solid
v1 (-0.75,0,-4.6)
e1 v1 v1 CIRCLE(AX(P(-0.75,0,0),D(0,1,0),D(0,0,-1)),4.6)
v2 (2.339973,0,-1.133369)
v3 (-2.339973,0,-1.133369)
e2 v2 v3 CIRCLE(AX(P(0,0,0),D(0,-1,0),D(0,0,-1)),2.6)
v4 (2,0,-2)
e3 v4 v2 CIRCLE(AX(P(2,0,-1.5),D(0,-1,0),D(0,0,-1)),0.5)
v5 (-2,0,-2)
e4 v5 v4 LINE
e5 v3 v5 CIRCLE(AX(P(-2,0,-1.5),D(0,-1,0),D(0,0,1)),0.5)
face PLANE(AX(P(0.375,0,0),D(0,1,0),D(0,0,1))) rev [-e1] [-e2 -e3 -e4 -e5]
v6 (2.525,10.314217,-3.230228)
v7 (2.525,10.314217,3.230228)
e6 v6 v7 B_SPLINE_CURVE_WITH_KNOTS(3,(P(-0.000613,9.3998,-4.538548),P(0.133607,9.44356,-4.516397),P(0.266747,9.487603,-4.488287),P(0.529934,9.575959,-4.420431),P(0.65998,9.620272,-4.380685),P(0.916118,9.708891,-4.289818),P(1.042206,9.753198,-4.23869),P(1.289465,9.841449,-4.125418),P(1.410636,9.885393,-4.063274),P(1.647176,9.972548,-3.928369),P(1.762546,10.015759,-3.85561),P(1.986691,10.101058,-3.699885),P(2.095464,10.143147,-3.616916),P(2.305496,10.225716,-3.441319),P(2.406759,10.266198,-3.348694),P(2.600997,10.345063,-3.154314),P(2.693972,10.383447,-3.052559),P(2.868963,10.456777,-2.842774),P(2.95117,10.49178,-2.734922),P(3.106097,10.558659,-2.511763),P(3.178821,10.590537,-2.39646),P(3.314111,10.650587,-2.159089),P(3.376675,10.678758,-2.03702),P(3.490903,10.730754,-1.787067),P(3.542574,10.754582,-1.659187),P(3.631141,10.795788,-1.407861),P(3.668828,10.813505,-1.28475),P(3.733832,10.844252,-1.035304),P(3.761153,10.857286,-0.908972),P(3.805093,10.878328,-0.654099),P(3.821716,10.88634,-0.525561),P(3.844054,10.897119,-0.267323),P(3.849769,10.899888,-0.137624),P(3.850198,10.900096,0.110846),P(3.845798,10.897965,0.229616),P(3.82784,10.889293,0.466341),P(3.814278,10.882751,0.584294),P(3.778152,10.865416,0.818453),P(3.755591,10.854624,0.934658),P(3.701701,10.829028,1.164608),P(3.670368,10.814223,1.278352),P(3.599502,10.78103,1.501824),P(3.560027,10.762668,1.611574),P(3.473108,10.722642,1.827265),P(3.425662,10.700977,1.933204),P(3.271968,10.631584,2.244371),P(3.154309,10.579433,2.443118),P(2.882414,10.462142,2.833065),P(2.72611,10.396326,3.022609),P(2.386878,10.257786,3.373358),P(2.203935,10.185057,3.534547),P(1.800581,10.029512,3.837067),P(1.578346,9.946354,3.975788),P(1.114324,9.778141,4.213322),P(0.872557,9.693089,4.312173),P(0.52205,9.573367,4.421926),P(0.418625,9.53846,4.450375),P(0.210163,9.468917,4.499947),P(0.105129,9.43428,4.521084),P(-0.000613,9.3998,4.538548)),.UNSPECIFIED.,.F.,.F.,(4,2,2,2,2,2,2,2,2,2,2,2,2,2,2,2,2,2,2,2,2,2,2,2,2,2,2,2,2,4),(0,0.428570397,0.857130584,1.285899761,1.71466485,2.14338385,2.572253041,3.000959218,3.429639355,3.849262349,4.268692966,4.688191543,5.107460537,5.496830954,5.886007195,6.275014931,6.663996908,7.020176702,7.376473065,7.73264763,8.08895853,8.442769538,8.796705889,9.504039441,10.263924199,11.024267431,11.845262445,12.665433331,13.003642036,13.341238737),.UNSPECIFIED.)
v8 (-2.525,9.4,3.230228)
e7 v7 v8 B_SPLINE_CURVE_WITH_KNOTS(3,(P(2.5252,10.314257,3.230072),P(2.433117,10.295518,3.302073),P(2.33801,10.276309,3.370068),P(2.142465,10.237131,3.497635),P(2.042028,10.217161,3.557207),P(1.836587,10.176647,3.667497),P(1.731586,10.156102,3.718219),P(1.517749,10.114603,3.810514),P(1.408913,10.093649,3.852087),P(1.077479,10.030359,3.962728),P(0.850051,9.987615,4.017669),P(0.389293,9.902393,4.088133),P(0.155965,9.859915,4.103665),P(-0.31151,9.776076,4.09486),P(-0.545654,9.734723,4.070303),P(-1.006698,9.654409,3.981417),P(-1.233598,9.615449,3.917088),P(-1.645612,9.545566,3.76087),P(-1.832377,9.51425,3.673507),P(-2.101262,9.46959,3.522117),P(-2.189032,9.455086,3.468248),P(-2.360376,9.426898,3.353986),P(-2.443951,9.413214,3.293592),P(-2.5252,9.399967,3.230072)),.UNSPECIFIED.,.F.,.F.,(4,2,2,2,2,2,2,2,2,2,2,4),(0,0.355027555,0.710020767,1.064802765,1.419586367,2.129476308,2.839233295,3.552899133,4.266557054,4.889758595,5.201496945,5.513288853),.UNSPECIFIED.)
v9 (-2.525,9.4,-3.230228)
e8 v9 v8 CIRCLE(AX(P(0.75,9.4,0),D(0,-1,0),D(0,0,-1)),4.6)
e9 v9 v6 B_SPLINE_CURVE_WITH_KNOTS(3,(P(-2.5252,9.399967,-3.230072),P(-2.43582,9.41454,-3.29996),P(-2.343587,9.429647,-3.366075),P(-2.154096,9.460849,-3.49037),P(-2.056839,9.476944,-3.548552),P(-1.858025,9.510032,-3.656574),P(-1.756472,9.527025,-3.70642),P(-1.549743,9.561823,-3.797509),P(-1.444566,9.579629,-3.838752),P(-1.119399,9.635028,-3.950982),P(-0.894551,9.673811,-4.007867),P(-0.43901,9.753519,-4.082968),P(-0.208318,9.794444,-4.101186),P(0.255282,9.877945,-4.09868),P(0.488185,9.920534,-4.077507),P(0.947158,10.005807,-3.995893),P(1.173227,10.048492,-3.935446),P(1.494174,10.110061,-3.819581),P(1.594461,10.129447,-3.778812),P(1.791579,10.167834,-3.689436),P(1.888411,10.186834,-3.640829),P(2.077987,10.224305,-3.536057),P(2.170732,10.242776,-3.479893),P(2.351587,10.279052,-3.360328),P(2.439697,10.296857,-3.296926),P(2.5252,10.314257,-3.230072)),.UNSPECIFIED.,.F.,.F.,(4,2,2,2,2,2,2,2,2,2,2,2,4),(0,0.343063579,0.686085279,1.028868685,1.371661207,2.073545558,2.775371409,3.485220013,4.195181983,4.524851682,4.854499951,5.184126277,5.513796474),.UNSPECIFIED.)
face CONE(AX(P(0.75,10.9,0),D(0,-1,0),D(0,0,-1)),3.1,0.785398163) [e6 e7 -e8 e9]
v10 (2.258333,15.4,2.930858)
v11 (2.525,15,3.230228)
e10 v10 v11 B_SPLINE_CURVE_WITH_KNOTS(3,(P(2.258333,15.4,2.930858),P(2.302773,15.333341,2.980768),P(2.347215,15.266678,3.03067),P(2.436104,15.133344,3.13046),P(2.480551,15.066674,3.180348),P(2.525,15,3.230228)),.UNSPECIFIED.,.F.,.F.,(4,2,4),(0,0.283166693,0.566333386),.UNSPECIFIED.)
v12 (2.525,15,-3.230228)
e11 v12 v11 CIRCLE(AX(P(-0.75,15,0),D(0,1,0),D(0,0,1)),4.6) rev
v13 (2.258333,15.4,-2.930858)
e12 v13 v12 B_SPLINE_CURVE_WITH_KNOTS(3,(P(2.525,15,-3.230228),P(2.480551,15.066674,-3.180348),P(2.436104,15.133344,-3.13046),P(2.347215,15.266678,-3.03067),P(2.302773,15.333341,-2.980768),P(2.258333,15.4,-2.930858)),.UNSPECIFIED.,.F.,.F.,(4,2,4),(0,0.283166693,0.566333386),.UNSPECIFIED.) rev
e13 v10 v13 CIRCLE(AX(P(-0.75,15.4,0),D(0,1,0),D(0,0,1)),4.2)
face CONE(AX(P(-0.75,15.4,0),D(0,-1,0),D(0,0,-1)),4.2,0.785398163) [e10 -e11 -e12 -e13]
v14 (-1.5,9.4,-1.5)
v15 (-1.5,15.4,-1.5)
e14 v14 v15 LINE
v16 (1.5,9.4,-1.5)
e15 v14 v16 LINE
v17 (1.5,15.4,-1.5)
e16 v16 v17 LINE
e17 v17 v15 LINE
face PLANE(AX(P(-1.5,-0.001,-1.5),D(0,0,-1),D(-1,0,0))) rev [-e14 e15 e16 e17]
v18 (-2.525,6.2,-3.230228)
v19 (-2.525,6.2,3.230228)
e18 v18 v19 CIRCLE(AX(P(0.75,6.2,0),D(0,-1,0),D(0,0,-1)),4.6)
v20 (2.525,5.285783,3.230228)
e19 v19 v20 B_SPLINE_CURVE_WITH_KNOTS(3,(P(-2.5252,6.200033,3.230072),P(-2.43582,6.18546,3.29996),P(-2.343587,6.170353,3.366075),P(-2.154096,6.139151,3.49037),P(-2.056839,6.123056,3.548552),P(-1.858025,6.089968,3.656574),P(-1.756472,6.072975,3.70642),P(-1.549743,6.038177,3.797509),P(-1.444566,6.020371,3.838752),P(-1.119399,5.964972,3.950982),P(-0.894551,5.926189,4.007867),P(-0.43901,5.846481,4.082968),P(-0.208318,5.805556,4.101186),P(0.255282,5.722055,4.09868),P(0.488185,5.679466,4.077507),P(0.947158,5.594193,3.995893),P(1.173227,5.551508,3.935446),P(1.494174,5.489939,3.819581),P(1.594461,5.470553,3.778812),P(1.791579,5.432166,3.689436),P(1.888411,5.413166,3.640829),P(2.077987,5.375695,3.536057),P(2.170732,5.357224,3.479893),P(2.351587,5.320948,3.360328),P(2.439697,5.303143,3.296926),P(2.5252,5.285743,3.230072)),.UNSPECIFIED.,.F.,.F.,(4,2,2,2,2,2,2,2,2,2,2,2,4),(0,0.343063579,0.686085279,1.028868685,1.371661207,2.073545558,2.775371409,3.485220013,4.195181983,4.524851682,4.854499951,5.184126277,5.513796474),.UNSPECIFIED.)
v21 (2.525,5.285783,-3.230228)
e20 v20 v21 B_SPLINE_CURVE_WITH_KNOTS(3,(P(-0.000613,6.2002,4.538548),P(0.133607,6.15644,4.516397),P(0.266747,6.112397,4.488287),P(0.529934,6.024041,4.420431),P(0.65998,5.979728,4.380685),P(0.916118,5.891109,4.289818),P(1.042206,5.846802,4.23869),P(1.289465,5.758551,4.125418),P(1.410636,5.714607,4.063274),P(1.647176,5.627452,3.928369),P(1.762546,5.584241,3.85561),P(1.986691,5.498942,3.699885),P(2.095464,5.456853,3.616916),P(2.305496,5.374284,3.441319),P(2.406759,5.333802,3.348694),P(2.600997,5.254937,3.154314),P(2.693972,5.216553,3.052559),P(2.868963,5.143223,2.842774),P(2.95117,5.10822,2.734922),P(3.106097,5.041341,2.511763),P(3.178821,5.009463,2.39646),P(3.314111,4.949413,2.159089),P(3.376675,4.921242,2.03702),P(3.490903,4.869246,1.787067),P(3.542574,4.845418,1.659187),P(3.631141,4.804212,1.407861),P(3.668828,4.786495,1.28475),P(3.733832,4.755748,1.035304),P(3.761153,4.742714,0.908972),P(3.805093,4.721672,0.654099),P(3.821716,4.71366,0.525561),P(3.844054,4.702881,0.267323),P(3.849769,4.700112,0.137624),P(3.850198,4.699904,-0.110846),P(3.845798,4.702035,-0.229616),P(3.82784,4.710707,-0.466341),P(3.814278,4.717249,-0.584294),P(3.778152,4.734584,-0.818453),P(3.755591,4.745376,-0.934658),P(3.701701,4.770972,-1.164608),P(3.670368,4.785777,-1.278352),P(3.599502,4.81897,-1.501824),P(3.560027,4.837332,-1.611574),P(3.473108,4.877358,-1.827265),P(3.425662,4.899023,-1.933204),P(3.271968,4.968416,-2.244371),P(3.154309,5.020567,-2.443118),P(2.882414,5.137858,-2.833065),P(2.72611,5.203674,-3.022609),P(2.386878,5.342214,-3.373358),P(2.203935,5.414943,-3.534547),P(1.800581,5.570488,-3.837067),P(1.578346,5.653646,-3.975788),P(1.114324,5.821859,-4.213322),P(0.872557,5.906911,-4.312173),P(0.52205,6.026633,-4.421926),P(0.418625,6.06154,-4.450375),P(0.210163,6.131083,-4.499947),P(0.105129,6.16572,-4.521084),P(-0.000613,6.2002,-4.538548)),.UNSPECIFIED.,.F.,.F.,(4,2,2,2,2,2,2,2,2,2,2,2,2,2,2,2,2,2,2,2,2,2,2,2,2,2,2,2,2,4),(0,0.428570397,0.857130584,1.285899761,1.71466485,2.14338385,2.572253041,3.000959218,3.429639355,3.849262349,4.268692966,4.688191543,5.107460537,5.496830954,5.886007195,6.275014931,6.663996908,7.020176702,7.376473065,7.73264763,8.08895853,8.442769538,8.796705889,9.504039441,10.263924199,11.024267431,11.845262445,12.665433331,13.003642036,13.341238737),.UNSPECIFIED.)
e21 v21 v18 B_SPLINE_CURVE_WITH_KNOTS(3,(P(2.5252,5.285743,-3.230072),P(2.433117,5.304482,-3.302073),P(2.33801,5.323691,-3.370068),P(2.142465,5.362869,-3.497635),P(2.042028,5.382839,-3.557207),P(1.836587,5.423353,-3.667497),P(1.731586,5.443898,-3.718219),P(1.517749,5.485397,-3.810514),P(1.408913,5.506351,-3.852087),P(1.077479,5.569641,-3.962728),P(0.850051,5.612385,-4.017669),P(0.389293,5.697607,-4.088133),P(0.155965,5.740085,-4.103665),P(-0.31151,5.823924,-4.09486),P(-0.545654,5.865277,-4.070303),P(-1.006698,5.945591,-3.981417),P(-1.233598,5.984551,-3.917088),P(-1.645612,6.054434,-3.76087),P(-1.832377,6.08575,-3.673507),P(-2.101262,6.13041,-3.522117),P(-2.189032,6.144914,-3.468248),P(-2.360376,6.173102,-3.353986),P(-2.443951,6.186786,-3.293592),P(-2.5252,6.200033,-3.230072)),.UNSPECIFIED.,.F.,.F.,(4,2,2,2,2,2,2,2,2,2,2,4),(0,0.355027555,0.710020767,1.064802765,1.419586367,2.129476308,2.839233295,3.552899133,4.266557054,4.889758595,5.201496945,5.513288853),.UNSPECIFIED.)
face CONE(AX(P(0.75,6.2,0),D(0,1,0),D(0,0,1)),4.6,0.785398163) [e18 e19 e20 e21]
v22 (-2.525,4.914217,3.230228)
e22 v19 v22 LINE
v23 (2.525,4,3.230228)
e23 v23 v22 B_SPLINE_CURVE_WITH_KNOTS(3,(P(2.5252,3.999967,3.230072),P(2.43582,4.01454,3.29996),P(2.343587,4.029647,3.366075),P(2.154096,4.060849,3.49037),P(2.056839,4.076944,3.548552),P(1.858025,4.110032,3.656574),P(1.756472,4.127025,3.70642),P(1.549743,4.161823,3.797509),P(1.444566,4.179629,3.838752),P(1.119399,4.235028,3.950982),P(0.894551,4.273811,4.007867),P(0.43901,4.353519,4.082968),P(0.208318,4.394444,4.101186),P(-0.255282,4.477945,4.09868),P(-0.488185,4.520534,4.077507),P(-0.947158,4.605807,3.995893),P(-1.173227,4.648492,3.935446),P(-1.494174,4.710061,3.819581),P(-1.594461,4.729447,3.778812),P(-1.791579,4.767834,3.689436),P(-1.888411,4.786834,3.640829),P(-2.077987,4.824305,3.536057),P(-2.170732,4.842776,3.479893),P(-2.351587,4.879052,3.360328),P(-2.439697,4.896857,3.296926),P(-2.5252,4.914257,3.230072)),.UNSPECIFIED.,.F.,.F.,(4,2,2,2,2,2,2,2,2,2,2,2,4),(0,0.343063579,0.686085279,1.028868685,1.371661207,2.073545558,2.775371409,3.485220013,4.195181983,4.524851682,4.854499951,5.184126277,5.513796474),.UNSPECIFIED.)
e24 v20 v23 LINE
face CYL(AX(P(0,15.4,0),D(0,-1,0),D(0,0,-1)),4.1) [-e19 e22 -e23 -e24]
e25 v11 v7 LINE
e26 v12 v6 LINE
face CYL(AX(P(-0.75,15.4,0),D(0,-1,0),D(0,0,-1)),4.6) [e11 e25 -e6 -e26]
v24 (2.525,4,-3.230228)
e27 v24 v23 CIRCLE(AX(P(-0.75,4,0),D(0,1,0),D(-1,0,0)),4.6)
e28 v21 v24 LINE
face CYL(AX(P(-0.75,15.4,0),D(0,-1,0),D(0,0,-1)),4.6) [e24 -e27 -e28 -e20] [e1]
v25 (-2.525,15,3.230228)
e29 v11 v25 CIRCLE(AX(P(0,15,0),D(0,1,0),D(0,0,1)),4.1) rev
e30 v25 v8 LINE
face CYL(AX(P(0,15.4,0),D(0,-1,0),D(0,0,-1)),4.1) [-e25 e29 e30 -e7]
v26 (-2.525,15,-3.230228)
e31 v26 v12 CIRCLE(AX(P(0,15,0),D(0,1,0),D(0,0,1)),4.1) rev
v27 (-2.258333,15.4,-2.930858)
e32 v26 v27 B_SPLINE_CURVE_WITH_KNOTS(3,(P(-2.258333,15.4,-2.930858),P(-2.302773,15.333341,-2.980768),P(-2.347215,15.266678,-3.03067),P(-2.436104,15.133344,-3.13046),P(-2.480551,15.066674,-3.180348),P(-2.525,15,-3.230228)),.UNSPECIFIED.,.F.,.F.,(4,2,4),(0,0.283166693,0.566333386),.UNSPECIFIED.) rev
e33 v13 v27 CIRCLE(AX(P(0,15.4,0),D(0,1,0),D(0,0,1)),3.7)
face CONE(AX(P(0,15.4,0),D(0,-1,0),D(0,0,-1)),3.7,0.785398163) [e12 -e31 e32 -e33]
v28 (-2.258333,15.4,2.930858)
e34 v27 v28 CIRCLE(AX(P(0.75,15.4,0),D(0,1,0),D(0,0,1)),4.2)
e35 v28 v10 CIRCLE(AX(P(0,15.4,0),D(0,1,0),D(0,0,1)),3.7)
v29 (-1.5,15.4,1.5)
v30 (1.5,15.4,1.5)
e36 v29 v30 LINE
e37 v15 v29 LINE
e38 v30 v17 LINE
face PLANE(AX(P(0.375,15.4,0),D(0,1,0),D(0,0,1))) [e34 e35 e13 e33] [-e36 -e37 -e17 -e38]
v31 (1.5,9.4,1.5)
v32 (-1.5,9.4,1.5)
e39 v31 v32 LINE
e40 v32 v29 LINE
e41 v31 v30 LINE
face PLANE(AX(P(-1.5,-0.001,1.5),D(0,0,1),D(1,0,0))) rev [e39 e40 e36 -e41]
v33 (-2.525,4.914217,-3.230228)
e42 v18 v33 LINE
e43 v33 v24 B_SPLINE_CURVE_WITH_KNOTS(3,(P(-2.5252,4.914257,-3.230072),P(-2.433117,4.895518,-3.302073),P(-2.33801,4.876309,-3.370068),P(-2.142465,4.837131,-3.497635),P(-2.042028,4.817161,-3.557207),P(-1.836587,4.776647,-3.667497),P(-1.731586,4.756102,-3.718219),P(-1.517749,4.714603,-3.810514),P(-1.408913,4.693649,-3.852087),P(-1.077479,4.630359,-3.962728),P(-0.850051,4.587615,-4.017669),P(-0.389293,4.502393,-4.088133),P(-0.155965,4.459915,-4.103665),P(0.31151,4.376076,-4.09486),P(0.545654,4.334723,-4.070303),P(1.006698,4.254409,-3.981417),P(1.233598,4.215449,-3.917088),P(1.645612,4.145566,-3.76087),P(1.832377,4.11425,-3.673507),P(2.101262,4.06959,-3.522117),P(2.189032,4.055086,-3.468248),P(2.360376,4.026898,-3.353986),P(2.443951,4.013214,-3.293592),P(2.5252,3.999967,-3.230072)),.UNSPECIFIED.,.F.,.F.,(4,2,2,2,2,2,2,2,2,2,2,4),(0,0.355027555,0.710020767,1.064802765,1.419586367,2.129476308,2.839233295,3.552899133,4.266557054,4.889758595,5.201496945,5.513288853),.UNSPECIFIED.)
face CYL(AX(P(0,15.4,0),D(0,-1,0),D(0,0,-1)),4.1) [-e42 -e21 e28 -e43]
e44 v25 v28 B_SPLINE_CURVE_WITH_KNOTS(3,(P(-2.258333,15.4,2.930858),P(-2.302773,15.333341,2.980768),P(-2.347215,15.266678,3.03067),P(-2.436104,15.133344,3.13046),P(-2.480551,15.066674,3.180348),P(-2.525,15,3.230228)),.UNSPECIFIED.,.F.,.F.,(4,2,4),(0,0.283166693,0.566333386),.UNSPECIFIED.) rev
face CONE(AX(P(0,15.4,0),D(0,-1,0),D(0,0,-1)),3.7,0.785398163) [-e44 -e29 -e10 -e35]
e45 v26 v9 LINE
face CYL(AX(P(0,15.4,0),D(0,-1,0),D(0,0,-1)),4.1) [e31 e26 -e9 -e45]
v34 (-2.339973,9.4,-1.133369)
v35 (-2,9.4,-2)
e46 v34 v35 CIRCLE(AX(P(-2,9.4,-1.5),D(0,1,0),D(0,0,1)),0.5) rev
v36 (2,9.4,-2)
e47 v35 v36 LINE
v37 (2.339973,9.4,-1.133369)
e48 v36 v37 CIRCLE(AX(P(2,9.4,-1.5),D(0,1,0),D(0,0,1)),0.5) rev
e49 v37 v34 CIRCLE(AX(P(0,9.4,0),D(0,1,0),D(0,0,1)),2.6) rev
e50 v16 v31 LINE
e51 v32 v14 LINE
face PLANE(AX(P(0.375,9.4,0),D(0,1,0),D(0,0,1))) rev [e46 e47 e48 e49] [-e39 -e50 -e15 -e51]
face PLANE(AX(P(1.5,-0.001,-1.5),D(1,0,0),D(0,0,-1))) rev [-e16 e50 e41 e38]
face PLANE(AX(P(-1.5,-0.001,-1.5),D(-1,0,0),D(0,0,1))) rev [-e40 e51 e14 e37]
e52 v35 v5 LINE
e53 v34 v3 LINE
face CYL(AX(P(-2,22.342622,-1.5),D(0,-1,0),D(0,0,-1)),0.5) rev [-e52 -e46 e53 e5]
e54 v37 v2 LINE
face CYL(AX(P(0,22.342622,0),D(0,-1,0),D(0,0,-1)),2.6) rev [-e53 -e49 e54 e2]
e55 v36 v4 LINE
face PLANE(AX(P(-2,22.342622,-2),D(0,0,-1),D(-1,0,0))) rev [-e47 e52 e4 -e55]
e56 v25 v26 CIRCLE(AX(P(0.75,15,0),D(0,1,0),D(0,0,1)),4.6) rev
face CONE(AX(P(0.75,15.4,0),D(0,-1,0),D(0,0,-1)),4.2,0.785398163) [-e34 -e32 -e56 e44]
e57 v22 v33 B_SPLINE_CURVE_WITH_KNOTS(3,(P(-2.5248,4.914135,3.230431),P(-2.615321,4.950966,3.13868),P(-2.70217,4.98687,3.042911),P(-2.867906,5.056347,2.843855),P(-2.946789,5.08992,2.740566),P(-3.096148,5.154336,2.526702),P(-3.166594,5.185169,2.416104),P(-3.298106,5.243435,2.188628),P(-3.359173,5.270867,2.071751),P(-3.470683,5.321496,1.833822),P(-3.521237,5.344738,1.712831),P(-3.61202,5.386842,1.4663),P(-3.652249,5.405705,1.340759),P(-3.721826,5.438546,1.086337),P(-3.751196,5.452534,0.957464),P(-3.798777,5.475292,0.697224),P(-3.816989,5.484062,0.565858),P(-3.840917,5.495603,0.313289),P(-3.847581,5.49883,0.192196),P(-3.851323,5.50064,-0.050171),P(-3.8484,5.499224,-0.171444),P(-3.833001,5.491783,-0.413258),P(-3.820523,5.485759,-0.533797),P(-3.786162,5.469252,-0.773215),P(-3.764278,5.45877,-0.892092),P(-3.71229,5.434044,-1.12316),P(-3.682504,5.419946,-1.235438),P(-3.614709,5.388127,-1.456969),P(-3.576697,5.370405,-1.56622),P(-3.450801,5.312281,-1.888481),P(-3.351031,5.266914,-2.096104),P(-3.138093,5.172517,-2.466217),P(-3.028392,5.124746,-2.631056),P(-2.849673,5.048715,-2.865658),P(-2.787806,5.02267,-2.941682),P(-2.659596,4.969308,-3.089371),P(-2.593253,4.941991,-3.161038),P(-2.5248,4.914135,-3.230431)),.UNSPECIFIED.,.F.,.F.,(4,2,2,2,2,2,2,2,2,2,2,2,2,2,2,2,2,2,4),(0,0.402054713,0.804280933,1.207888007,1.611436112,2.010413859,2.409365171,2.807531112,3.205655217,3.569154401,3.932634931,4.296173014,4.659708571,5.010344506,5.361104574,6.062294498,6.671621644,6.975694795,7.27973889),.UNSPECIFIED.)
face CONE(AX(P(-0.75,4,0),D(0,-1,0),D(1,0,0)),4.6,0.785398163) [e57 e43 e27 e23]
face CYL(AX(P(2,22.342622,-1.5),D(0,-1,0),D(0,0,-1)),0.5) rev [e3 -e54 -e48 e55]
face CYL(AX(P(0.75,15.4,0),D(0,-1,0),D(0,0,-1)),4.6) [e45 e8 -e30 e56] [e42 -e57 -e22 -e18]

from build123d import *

# Parameters (mm, degrees)
BOSS_EXTRUDE1_DEPTH = 15.4
CUT_EXTRUDE1_DEPTH  = 9.4
CUT_EXTRUDE2_REACH  = 18.939
SKETCH5_W           = 3
SKETCH5_H           = 3
CHAMFER1_SIZE       = 0.4


with BuildPart() as part:
    # Sketch1 → Boss-Extrude1 (new body)
    with BuildSketch(Plane(origin=(0, 0, 0), x_dir=(1, 0, 0), z_dir=(0, 1, 0))):
        with BuildLine():
            ThreePointArc((-2.525, -3.23022832), (0, -4.1), (2.525, -3.23022832))
            ThreePointArc((2.525, -3.23022832), (3.85, 0), (2.525, 3.23022832))
            ThreePointArc((2.525, 3.23022832), (0, 4.1), (-2.525, 3.23022832))
            ThreePointArc((-2.525, 3.23022832), (-3.85, 0), (-2.525, -3.23022832))
        make_face()
    extrude(amount=BOSS_EXTRUDE1_DEPTH)

    # Sketch2 → Revolve1 (revolve)
    with BuildSketch(Plane.XY, mode=Mode.PRIVATE) as revolve1_sk:
        Polygon((3.85, 0), (3.85, 4), (2.35, 5.5), (-0.75, 5.5), (-0.75, 0), align=None)
    revolve(revolve1_sk.sketch.rotate(Axis((-0.75, 5.5, 0), (0, -1, 0)), 270), axis=Axis((-0.75, 5.5, 0), (0, -1, 0)))

    # Sketch3 → Revolve2 (revolve)
    with BuildSketch(Plane.XY, mode=Mode.PRIVATE) as revolve2_sk:
        Polygon((0.75, 4.7), (-2.35, 4.7), (-3.85, 6.2), (-3.85, 9.4), (-2.35, 10.9), (0.75, 10.9), align=None)
    revolve(revolve2_sk.sketch.rotate(Axis((0.75, 4.7, 0), (0, 1, 0)), 315.394327097), axis=Axis((0.75, 4.7, 0), (0, 1, 0)))

    # Sketch4 → Cut-Extrude1 (cut)
    with BuildSketch(Plane.XZ):
        with BuildLine():
            Line((-2, -2), (2, -2))
            ThreePointArc((2, -2), (2.465465068, -1.682598659), (2.339973189, -1.133369081))
            ThreePointArc((2.339973189, -1.133369081), (0, 2.6), (-2.339973189, -1.133369081))
            ThreePointArc((-2.339973189, -1.133369081), (-2.465465068, -1.682598659), (-2, -2))
        make_face()
    extrude(amount=-CUT_EXTRUDE1_DEPTH, mode=Mode.SUBTRACT)

    # Sketch5 → Cut-Extrude2 (cut, up to next)
    with BuildSketch(Plane(origin=(0, 15.4, 0), x_dir=(1, 0, 0), z_dir=(0, 1, 0)), mode=Mode.PRIVATE) as cut_extrude2_sk1:
        Rectangle(SKETCH5_W, SKETCH5_H)
    cut_extrude2_tool1 = extrude(cut_extrude2_sk1.sketch, amount=-CUT_EXTRUDE2_REACH, mode=Mode.PRIVATE) & part.part
    add(cut_extrude2_tool1.solids().sort_by_distance((0, 15.4, 0))[0], mode=Mode.SUBTRACT)

    # Chamfer1
    # the kernel refuses this chamfer: 0.4 mm, written as the material it takes off along each edge
    with BuildSketch(Plane(origin=(0, 15.4, 0), x_dir=(-0.7922190522423981, 0, 0.6102368173620439), z_dir=(-0.6102368173620439, 0, -0.7922190522423981))) as chamfer1_piece_1:
        Polygon((4.1 - CHAMFER1_SIZE, 0), (4.1, -CHAMFER1_SIZE), (4.1, 0), align=None)
    revolve(axis=Axis((0, 15.4, 0), (0, 1, 0)), revolution_arc=104.786743256, mode=Mode.SUBTRACT)
    with BuildSketch(Plane(origin=(-0.75, 15.4, 0), x_dir=(0.5384255548923128, 0, 0.8426730812354843), z_dir=(-0.8426730812354843, 0, 0.5384255548923128))) as chamfer1_piece_2:
        Polygon((4.6 - CHAMFER1_SIZE, 0), (4.6, -CHAMFER1_SIZE), (4.6, 0), align=None)
    revolve(axis=Axis((-0.75, 15.4, 0), (0, 1, 0)), revolution_arc=114.846952535, mode=Mode.SUBTRACT)
    with BuildSketch(Plane(origin=(0, 15.4, 0), x_dir=(0.7922190522423987, 0, -0.610236817362043), z_dir=(0.610236817362043, 0, 0.7922190522423987))) as chamfer1_piece_3:
        Polygon((4.1 - CHAMFER1_SIZE, 0), (4.1, -CHAMFER1_SIZE), (4.1, 0), align=None)
    revolve(axis=Axis((0, 15.4, 0), (0, 1, 0)), revolution_arc=104.786743256, mode=Mode.SUBTRACT)
    with BuildSketch(Plane(origin=(0.75, 15.4, 0), x_dir=(-0.5384255548923127, 0, -0.8426730812354845), z_dir=(0.8426730812354845, 0, -0.5384255548923127))) as chamfer1_piece_4:
        Polygon((4.6 - CHAMFER1_SIZE, 0), (4.6, -CHAMFER1_SIZE), (4.6, 0), align=None)
    revolve(axis=Axis((0.75, 15.4, 0), (0, 1, 0)), revolution_arc=114.846952535, mode=Mode.SUBTRACT)


solid = part.part
